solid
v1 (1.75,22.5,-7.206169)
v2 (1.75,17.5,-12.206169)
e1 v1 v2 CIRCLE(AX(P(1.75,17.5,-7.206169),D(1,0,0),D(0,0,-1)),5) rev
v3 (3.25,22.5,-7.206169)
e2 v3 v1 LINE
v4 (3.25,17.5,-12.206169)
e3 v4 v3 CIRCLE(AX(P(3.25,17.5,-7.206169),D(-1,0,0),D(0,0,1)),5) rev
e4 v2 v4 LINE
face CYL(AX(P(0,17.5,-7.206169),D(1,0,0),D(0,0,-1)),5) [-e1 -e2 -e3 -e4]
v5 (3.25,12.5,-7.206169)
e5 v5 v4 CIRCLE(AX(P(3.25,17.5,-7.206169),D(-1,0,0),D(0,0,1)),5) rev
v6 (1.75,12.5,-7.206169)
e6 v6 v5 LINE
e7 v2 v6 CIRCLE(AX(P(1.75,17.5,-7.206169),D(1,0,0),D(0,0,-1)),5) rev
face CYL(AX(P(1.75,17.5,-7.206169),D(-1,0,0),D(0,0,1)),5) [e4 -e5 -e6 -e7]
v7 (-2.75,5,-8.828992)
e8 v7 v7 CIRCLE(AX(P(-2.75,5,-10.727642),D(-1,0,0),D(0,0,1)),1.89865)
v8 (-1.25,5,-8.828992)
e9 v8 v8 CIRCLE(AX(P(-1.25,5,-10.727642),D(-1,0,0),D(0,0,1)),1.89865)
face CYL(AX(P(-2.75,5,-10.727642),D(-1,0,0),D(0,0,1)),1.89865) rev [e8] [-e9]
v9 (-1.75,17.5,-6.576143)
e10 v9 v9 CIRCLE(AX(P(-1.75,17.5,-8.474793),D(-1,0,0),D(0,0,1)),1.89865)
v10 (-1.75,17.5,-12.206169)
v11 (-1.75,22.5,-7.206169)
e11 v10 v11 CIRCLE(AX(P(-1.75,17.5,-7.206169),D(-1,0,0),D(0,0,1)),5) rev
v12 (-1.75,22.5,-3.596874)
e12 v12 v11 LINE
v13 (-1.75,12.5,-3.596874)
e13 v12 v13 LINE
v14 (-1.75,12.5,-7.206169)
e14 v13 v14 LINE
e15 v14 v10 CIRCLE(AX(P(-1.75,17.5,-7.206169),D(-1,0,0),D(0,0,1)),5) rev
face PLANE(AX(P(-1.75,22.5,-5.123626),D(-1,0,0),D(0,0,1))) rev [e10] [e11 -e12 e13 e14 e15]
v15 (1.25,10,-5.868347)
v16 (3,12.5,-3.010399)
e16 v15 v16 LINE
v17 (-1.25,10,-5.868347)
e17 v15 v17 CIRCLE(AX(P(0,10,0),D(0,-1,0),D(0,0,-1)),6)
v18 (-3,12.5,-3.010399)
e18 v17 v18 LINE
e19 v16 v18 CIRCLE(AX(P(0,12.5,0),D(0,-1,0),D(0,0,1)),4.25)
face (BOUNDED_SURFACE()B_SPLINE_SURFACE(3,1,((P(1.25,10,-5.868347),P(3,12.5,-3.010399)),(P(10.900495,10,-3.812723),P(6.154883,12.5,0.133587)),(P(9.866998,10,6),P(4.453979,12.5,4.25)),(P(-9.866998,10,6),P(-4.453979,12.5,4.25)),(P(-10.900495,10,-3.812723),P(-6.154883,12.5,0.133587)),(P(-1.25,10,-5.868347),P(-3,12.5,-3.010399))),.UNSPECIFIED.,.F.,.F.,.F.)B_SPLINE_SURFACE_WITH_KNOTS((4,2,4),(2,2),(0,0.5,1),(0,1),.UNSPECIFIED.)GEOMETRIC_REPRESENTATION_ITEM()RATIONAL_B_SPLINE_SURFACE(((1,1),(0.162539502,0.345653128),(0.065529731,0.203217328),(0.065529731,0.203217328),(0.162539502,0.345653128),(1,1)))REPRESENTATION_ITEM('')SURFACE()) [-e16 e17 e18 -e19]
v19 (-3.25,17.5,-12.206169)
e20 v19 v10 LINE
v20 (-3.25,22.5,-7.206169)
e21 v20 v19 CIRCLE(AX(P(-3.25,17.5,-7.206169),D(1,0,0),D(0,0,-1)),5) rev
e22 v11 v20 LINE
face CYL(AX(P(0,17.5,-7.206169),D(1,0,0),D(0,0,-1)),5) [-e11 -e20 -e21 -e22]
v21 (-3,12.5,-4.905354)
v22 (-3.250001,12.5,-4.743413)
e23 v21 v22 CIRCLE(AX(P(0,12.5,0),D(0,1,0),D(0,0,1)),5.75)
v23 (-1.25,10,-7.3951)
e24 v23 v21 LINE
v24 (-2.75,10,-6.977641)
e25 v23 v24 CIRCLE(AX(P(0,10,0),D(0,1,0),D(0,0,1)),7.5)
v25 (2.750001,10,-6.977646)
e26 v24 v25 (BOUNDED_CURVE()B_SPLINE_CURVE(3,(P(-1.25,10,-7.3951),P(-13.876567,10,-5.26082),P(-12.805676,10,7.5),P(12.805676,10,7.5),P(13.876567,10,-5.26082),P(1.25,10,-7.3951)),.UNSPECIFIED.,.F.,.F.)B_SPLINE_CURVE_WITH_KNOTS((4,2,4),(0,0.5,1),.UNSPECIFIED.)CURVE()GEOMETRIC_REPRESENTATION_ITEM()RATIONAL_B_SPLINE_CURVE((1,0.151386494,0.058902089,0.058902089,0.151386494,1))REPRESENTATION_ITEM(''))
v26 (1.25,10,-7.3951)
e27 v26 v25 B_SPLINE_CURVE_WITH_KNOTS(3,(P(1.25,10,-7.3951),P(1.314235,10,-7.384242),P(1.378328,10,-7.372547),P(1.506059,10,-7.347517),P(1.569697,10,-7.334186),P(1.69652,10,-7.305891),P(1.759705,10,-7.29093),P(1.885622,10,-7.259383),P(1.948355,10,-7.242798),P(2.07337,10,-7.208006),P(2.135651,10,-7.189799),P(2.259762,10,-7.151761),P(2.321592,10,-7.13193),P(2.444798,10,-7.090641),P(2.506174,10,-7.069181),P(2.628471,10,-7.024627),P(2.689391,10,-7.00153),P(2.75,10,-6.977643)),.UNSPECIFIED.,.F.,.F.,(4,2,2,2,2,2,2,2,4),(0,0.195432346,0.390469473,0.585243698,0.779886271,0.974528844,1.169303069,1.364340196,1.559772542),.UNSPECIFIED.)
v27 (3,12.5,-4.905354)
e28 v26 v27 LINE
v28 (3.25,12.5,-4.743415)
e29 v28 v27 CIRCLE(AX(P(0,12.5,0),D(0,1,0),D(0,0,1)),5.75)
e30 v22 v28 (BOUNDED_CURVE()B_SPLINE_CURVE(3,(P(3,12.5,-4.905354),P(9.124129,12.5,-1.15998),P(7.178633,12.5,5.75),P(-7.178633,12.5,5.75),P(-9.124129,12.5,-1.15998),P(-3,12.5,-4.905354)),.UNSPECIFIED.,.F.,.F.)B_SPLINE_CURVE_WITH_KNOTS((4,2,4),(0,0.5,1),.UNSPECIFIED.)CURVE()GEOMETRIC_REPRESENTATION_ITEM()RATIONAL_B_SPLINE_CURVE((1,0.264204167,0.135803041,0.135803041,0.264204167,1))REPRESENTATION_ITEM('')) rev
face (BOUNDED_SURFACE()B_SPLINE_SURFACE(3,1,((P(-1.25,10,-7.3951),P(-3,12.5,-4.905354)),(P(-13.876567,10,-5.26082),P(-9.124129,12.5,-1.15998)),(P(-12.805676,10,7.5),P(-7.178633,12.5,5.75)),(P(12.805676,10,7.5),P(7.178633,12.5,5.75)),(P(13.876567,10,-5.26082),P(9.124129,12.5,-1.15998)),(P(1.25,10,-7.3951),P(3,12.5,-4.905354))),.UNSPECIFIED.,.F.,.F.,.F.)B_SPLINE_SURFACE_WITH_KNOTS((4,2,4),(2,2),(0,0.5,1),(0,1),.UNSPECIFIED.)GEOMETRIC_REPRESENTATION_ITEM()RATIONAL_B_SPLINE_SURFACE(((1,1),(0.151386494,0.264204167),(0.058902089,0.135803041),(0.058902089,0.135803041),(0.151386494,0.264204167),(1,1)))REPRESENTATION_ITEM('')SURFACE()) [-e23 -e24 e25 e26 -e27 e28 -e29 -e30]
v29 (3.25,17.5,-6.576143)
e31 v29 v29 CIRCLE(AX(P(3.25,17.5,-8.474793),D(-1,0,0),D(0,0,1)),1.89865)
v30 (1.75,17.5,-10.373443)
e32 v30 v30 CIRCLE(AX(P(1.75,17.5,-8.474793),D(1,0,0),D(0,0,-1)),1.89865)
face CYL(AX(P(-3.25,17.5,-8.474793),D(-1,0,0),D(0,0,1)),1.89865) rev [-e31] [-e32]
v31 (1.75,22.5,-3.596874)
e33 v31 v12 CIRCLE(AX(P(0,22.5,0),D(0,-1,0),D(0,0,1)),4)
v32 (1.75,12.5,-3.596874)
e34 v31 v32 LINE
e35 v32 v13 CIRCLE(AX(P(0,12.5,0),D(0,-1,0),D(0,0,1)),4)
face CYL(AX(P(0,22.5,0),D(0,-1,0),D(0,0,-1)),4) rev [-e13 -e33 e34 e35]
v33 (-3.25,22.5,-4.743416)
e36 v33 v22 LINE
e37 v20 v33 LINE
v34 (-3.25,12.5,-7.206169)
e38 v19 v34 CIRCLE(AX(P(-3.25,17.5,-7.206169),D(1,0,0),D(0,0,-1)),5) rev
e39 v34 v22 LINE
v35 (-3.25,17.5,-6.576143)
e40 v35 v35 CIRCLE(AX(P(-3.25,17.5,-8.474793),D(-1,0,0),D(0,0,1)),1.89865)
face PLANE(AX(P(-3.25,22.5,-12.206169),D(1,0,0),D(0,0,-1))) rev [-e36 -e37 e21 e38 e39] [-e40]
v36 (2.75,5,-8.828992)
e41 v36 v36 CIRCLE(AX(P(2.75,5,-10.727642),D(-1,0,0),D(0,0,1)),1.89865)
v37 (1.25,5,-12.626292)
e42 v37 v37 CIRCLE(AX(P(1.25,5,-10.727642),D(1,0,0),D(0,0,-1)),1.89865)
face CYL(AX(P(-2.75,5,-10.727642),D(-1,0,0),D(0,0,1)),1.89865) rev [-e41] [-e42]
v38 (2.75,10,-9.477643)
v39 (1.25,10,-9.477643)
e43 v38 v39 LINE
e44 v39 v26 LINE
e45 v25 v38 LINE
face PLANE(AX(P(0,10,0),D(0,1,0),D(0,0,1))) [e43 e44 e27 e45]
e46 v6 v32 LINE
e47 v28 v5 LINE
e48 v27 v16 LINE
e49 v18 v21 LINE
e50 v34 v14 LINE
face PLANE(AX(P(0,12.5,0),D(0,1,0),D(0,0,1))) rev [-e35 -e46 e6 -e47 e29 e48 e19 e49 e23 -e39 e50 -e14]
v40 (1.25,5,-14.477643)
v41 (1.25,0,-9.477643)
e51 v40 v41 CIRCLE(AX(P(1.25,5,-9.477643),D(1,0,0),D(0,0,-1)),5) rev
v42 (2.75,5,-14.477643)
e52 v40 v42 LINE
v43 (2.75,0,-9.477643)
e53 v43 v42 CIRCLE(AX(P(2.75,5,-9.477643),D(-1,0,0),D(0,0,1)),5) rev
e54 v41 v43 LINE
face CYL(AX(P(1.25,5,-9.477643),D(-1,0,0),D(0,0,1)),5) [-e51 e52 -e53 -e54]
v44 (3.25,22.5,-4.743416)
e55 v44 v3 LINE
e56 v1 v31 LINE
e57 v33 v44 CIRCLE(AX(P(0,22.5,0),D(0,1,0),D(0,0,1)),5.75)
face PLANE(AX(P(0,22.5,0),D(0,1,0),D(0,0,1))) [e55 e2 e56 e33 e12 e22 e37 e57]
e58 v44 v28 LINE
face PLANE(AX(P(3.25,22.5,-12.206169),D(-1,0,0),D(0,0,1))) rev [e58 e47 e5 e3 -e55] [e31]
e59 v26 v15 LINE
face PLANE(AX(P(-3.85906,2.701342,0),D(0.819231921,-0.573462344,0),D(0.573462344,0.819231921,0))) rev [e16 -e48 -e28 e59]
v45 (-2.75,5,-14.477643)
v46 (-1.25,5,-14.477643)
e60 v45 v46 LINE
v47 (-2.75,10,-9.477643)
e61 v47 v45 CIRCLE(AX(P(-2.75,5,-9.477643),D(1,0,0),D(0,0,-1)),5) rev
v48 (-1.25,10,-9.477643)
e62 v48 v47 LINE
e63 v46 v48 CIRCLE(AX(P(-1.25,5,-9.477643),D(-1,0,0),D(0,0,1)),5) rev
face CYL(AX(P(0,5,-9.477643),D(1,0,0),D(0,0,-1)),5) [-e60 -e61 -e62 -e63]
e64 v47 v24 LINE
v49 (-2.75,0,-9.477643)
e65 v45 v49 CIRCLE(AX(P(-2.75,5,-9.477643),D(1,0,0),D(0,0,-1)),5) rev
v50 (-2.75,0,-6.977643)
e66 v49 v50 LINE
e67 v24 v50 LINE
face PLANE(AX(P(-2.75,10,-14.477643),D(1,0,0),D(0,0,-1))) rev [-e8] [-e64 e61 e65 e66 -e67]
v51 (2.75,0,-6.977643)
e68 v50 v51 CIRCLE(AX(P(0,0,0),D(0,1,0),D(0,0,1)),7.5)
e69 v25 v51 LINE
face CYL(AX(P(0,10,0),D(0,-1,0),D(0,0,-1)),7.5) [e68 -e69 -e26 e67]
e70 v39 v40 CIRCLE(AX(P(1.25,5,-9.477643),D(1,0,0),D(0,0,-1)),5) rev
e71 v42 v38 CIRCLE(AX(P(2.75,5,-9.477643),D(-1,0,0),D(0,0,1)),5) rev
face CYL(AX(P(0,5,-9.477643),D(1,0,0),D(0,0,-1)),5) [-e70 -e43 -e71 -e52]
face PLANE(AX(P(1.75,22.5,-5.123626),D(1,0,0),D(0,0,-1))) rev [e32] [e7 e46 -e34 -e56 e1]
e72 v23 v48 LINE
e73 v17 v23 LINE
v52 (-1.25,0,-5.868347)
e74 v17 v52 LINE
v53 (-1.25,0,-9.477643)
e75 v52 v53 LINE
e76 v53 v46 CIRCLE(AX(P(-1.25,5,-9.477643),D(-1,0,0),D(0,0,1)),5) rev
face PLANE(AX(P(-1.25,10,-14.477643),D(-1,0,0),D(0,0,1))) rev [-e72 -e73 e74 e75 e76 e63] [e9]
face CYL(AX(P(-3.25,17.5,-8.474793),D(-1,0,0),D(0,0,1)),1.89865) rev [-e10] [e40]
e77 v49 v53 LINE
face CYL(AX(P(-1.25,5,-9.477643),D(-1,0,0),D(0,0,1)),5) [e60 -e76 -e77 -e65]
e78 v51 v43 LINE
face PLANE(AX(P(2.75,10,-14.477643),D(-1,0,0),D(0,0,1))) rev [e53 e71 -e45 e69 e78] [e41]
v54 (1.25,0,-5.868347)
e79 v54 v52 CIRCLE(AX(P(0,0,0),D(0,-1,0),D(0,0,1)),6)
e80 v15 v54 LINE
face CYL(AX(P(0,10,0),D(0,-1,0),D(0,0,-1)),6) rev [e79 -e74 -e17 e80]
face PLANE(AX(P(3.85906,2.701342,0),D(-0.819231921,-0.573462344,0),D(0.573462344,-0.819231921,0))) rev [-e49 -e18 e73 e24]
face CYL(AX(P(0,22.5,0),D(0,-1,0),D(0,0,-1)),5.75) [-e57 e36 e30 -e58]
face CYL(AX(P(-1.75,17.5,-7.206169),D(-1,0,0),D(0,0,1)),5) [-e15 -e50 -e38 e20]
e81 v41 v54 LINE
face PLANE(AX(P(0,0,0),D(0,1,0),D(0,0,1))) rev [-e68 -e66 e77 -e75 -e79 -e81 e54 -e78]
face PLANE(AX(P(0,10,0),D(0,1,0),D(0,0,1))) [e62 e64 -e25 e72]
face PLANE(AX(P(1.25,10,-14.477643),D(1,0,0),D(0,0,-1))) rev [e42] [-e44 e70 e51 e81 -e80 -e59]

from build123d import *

# Parameters (mm, degrees)
BOSS_EXTRUDE1_DEPTH   = 10
BOSS_EXTRUDE2_DEPTH   = 10
F_6_CLEARANCE_HOLE1_D = 3.7973
F_6_CLEARANCE_HOLE2_D = 3.7973
FILLET1_R             = 5


with BuildPart() as part:
    # Sketch1 → Boss-Extrude1 (new body)
    with BuildSketch(Plane(origin=(0, 0, 0), x_dir=(1, 0, 0), z_dir=(0, 1, 0))):
        with BuildLine():
            Line((-1.25, 14.477642868), (-1.25, 5.868347297))
            ThreePointArc((-1.25, 5.868347297), (0, -6), (1.25, 5.868347297))
            Line((1.25, 5.868347297), (1.25, 14.477642868))
            Line((1.25, 14.477642868), (2.75, 14.477642868))
            Line((2.75, 14.477642868), (2.75, 6.977642868))
            ThreePointArc((2.75, 6.977642868), (0, -7.5), (-2.75, 6.977642868))
            Line((-2.75, 6.977642868), (-2.75, 14.477642868))
            Line((-2.75, 14.477642868), (-1.25, 14.477642868))
        make_face()
    extrude(amount=BOSS_EXTRUDE1_DEPTH)

    # Loft1: read off the stored shape, not the designer's step
    # Loft1: loft between two sections, ruled curve by curve
    loft1_from = [
        Edge.make_bspline([(1.25, 10, -5.868347297), (10.900494926, 10, -3.812722767), (9.866997746, 10, 6), (-9.866997746, 10, 6), (-10.900494926, 10, -3.812722767), (-1.25, 10, -5.868347297)], [0, 0, 0, 0, 0.5, 0.5, 1, 1, 1, 1], 3, [1, 0.162539502, 0.065529731, 0.065529731, 0.162539502, 1]),
        Edge.make_bspline([(-1.25, 10, -7.395099729), (-13.876567029, 10, -5.260820359), (-12.805676217, 10, 7.5), (12.805676217, 10, 7.5), (13.876567029, 10, -5.260820359), (1.25, 10, -7.395099729)], [0, 0, 0, 0, 0.5, 0.5, 1, 1, 1, 1], 3, [1, 0.151386494, 0.058902089, 0.058902089, 0.151386494, 1]),
        Edge.make_line((-1.25, 10, -7.395099729), (-1.25, 10, -5.868347297)),
        Edge.make_line((1.25, 10, -5.868347297), (1.25, 10, -7.395099729)),
    ]
    loft1_to = [
        Edge.make_bspline([(3, 12.5, -3.010398645), (6.15488313, 12.5, 0.133586757), (4.453979318, 12.5, 4.25), (-4.453979318, 12.5, 4.25), (-6.15488313, 12.5, 0.133586757), (-3, 12.5, -3.010398645)], [0, 0, 0, 0, 0.5, 0.5, 1, 1, 1, 1], 3, [1, 0.345653128, 0.203217328, 0.203217328, 0.345653128, 1]),
        Edge.make_bspline([(-3, 12.5, -4.905354218), (-9.124128689, 12.5, -1.159980234), (-7.178633469, 12.5, 5.75), (7.178633469, 12.5, 5.75), (9.124128689, 12.5, -1.159980234), (3, 12.5, -4.905354218)], [0, 0, 0, 0, 0.5, 0.5, 1, 1, 1, 1], 3, [1, 0.264204167, 0.135803041, 0.135803041, 0.264204167, 1]),
        Edge.make_line((-3, 12.5, -4.905354218), (-3, 12.5, -3.010398645)),
        Edge.make_line((3, 12.5, -3.010398645), (3, 12.5, -4.905354218)),
    ]
    loft1 = Solid(Shell([*[Face.make_surface_from_curves(loft1_from[k], loft1_to[k]) for k in range(4)], Face(Wire(loft1_from)), Face(Wire(loft1_to))]))
    add(loft1)

    # Sketch4 → Boss-Extrude2 (add)
    with BuildSketch(Plane(origin=(0, 12.5, 0), x_dir=(1, 0, 0), z_dir=(0, 1, 0))):
        with BuildLine():
            Line((-1.75, 5.123626074), (-1.75, 12.206169214))
            Line((-1.75, 12.206169214), (-3.25, 12.206169214))
            Line((-3.25, 12.206169214), (-3.25, 4.74341649))
            ThreePointArc((-3.25, 4.74341649), (0, -5.75), (3.25, 4.74341649))
            Line((3.25, 4.74341649), (3.25, 12.206169214))
            Line((3.25, 12.206169214), (1.75, 12.206169214))
            Line((1.75, 12.206169214), (1.75, 5.123626074))
            Line((1.75, 5.123626074), (1.75, 3.596873642))
            ThreePointArc((1.75, 3.596873642), (0, -4), (-1.75, 3.596873642))
            Line((-1.75, 3.596873642), (-1.75, 5.123626074))
        make_face()
    extrude(amount=BOSS_EXTRUDE2_DEPTH)

    # #6 Clearance Hole1 (through all)
    with Locations(Plane.ZY.offset(2.75)):
        with Locations((-10.727642082, 5)):
            Hole(F_6_CLEARANCE_HOLE1_D / 2)

    # #6 Clearance Hole2 (through all)
    with Locations(Plane.ZY.offset(3.25)):
        with Locations((-8.474792852, 17.5)):
            Hole(F_6_CLEARANCE_HOLE2_D / 2)

    # Fillet1
    fillet1_edges = [part.edges().sort_by_distance(p)[0] for p in [
        (2, 0, -14.477642868),
        (-2, 0, -14.477642868),
        (-2.5, 12.5, -12.206169214),
        (2.5, 12.5, -12.206169214),
        (-2.5, 22.5, -12.206169214),
        (2.5, 22.5, -12.206169214),
        (2, 10, -14.477642868),
        (-2, 10, -14.477642868),
    ]]
    fillet(fillet1_edges, radius=FILLET1_R - 0.0001)  # a hair under: the kernel refuses the full size


solid = part.part
